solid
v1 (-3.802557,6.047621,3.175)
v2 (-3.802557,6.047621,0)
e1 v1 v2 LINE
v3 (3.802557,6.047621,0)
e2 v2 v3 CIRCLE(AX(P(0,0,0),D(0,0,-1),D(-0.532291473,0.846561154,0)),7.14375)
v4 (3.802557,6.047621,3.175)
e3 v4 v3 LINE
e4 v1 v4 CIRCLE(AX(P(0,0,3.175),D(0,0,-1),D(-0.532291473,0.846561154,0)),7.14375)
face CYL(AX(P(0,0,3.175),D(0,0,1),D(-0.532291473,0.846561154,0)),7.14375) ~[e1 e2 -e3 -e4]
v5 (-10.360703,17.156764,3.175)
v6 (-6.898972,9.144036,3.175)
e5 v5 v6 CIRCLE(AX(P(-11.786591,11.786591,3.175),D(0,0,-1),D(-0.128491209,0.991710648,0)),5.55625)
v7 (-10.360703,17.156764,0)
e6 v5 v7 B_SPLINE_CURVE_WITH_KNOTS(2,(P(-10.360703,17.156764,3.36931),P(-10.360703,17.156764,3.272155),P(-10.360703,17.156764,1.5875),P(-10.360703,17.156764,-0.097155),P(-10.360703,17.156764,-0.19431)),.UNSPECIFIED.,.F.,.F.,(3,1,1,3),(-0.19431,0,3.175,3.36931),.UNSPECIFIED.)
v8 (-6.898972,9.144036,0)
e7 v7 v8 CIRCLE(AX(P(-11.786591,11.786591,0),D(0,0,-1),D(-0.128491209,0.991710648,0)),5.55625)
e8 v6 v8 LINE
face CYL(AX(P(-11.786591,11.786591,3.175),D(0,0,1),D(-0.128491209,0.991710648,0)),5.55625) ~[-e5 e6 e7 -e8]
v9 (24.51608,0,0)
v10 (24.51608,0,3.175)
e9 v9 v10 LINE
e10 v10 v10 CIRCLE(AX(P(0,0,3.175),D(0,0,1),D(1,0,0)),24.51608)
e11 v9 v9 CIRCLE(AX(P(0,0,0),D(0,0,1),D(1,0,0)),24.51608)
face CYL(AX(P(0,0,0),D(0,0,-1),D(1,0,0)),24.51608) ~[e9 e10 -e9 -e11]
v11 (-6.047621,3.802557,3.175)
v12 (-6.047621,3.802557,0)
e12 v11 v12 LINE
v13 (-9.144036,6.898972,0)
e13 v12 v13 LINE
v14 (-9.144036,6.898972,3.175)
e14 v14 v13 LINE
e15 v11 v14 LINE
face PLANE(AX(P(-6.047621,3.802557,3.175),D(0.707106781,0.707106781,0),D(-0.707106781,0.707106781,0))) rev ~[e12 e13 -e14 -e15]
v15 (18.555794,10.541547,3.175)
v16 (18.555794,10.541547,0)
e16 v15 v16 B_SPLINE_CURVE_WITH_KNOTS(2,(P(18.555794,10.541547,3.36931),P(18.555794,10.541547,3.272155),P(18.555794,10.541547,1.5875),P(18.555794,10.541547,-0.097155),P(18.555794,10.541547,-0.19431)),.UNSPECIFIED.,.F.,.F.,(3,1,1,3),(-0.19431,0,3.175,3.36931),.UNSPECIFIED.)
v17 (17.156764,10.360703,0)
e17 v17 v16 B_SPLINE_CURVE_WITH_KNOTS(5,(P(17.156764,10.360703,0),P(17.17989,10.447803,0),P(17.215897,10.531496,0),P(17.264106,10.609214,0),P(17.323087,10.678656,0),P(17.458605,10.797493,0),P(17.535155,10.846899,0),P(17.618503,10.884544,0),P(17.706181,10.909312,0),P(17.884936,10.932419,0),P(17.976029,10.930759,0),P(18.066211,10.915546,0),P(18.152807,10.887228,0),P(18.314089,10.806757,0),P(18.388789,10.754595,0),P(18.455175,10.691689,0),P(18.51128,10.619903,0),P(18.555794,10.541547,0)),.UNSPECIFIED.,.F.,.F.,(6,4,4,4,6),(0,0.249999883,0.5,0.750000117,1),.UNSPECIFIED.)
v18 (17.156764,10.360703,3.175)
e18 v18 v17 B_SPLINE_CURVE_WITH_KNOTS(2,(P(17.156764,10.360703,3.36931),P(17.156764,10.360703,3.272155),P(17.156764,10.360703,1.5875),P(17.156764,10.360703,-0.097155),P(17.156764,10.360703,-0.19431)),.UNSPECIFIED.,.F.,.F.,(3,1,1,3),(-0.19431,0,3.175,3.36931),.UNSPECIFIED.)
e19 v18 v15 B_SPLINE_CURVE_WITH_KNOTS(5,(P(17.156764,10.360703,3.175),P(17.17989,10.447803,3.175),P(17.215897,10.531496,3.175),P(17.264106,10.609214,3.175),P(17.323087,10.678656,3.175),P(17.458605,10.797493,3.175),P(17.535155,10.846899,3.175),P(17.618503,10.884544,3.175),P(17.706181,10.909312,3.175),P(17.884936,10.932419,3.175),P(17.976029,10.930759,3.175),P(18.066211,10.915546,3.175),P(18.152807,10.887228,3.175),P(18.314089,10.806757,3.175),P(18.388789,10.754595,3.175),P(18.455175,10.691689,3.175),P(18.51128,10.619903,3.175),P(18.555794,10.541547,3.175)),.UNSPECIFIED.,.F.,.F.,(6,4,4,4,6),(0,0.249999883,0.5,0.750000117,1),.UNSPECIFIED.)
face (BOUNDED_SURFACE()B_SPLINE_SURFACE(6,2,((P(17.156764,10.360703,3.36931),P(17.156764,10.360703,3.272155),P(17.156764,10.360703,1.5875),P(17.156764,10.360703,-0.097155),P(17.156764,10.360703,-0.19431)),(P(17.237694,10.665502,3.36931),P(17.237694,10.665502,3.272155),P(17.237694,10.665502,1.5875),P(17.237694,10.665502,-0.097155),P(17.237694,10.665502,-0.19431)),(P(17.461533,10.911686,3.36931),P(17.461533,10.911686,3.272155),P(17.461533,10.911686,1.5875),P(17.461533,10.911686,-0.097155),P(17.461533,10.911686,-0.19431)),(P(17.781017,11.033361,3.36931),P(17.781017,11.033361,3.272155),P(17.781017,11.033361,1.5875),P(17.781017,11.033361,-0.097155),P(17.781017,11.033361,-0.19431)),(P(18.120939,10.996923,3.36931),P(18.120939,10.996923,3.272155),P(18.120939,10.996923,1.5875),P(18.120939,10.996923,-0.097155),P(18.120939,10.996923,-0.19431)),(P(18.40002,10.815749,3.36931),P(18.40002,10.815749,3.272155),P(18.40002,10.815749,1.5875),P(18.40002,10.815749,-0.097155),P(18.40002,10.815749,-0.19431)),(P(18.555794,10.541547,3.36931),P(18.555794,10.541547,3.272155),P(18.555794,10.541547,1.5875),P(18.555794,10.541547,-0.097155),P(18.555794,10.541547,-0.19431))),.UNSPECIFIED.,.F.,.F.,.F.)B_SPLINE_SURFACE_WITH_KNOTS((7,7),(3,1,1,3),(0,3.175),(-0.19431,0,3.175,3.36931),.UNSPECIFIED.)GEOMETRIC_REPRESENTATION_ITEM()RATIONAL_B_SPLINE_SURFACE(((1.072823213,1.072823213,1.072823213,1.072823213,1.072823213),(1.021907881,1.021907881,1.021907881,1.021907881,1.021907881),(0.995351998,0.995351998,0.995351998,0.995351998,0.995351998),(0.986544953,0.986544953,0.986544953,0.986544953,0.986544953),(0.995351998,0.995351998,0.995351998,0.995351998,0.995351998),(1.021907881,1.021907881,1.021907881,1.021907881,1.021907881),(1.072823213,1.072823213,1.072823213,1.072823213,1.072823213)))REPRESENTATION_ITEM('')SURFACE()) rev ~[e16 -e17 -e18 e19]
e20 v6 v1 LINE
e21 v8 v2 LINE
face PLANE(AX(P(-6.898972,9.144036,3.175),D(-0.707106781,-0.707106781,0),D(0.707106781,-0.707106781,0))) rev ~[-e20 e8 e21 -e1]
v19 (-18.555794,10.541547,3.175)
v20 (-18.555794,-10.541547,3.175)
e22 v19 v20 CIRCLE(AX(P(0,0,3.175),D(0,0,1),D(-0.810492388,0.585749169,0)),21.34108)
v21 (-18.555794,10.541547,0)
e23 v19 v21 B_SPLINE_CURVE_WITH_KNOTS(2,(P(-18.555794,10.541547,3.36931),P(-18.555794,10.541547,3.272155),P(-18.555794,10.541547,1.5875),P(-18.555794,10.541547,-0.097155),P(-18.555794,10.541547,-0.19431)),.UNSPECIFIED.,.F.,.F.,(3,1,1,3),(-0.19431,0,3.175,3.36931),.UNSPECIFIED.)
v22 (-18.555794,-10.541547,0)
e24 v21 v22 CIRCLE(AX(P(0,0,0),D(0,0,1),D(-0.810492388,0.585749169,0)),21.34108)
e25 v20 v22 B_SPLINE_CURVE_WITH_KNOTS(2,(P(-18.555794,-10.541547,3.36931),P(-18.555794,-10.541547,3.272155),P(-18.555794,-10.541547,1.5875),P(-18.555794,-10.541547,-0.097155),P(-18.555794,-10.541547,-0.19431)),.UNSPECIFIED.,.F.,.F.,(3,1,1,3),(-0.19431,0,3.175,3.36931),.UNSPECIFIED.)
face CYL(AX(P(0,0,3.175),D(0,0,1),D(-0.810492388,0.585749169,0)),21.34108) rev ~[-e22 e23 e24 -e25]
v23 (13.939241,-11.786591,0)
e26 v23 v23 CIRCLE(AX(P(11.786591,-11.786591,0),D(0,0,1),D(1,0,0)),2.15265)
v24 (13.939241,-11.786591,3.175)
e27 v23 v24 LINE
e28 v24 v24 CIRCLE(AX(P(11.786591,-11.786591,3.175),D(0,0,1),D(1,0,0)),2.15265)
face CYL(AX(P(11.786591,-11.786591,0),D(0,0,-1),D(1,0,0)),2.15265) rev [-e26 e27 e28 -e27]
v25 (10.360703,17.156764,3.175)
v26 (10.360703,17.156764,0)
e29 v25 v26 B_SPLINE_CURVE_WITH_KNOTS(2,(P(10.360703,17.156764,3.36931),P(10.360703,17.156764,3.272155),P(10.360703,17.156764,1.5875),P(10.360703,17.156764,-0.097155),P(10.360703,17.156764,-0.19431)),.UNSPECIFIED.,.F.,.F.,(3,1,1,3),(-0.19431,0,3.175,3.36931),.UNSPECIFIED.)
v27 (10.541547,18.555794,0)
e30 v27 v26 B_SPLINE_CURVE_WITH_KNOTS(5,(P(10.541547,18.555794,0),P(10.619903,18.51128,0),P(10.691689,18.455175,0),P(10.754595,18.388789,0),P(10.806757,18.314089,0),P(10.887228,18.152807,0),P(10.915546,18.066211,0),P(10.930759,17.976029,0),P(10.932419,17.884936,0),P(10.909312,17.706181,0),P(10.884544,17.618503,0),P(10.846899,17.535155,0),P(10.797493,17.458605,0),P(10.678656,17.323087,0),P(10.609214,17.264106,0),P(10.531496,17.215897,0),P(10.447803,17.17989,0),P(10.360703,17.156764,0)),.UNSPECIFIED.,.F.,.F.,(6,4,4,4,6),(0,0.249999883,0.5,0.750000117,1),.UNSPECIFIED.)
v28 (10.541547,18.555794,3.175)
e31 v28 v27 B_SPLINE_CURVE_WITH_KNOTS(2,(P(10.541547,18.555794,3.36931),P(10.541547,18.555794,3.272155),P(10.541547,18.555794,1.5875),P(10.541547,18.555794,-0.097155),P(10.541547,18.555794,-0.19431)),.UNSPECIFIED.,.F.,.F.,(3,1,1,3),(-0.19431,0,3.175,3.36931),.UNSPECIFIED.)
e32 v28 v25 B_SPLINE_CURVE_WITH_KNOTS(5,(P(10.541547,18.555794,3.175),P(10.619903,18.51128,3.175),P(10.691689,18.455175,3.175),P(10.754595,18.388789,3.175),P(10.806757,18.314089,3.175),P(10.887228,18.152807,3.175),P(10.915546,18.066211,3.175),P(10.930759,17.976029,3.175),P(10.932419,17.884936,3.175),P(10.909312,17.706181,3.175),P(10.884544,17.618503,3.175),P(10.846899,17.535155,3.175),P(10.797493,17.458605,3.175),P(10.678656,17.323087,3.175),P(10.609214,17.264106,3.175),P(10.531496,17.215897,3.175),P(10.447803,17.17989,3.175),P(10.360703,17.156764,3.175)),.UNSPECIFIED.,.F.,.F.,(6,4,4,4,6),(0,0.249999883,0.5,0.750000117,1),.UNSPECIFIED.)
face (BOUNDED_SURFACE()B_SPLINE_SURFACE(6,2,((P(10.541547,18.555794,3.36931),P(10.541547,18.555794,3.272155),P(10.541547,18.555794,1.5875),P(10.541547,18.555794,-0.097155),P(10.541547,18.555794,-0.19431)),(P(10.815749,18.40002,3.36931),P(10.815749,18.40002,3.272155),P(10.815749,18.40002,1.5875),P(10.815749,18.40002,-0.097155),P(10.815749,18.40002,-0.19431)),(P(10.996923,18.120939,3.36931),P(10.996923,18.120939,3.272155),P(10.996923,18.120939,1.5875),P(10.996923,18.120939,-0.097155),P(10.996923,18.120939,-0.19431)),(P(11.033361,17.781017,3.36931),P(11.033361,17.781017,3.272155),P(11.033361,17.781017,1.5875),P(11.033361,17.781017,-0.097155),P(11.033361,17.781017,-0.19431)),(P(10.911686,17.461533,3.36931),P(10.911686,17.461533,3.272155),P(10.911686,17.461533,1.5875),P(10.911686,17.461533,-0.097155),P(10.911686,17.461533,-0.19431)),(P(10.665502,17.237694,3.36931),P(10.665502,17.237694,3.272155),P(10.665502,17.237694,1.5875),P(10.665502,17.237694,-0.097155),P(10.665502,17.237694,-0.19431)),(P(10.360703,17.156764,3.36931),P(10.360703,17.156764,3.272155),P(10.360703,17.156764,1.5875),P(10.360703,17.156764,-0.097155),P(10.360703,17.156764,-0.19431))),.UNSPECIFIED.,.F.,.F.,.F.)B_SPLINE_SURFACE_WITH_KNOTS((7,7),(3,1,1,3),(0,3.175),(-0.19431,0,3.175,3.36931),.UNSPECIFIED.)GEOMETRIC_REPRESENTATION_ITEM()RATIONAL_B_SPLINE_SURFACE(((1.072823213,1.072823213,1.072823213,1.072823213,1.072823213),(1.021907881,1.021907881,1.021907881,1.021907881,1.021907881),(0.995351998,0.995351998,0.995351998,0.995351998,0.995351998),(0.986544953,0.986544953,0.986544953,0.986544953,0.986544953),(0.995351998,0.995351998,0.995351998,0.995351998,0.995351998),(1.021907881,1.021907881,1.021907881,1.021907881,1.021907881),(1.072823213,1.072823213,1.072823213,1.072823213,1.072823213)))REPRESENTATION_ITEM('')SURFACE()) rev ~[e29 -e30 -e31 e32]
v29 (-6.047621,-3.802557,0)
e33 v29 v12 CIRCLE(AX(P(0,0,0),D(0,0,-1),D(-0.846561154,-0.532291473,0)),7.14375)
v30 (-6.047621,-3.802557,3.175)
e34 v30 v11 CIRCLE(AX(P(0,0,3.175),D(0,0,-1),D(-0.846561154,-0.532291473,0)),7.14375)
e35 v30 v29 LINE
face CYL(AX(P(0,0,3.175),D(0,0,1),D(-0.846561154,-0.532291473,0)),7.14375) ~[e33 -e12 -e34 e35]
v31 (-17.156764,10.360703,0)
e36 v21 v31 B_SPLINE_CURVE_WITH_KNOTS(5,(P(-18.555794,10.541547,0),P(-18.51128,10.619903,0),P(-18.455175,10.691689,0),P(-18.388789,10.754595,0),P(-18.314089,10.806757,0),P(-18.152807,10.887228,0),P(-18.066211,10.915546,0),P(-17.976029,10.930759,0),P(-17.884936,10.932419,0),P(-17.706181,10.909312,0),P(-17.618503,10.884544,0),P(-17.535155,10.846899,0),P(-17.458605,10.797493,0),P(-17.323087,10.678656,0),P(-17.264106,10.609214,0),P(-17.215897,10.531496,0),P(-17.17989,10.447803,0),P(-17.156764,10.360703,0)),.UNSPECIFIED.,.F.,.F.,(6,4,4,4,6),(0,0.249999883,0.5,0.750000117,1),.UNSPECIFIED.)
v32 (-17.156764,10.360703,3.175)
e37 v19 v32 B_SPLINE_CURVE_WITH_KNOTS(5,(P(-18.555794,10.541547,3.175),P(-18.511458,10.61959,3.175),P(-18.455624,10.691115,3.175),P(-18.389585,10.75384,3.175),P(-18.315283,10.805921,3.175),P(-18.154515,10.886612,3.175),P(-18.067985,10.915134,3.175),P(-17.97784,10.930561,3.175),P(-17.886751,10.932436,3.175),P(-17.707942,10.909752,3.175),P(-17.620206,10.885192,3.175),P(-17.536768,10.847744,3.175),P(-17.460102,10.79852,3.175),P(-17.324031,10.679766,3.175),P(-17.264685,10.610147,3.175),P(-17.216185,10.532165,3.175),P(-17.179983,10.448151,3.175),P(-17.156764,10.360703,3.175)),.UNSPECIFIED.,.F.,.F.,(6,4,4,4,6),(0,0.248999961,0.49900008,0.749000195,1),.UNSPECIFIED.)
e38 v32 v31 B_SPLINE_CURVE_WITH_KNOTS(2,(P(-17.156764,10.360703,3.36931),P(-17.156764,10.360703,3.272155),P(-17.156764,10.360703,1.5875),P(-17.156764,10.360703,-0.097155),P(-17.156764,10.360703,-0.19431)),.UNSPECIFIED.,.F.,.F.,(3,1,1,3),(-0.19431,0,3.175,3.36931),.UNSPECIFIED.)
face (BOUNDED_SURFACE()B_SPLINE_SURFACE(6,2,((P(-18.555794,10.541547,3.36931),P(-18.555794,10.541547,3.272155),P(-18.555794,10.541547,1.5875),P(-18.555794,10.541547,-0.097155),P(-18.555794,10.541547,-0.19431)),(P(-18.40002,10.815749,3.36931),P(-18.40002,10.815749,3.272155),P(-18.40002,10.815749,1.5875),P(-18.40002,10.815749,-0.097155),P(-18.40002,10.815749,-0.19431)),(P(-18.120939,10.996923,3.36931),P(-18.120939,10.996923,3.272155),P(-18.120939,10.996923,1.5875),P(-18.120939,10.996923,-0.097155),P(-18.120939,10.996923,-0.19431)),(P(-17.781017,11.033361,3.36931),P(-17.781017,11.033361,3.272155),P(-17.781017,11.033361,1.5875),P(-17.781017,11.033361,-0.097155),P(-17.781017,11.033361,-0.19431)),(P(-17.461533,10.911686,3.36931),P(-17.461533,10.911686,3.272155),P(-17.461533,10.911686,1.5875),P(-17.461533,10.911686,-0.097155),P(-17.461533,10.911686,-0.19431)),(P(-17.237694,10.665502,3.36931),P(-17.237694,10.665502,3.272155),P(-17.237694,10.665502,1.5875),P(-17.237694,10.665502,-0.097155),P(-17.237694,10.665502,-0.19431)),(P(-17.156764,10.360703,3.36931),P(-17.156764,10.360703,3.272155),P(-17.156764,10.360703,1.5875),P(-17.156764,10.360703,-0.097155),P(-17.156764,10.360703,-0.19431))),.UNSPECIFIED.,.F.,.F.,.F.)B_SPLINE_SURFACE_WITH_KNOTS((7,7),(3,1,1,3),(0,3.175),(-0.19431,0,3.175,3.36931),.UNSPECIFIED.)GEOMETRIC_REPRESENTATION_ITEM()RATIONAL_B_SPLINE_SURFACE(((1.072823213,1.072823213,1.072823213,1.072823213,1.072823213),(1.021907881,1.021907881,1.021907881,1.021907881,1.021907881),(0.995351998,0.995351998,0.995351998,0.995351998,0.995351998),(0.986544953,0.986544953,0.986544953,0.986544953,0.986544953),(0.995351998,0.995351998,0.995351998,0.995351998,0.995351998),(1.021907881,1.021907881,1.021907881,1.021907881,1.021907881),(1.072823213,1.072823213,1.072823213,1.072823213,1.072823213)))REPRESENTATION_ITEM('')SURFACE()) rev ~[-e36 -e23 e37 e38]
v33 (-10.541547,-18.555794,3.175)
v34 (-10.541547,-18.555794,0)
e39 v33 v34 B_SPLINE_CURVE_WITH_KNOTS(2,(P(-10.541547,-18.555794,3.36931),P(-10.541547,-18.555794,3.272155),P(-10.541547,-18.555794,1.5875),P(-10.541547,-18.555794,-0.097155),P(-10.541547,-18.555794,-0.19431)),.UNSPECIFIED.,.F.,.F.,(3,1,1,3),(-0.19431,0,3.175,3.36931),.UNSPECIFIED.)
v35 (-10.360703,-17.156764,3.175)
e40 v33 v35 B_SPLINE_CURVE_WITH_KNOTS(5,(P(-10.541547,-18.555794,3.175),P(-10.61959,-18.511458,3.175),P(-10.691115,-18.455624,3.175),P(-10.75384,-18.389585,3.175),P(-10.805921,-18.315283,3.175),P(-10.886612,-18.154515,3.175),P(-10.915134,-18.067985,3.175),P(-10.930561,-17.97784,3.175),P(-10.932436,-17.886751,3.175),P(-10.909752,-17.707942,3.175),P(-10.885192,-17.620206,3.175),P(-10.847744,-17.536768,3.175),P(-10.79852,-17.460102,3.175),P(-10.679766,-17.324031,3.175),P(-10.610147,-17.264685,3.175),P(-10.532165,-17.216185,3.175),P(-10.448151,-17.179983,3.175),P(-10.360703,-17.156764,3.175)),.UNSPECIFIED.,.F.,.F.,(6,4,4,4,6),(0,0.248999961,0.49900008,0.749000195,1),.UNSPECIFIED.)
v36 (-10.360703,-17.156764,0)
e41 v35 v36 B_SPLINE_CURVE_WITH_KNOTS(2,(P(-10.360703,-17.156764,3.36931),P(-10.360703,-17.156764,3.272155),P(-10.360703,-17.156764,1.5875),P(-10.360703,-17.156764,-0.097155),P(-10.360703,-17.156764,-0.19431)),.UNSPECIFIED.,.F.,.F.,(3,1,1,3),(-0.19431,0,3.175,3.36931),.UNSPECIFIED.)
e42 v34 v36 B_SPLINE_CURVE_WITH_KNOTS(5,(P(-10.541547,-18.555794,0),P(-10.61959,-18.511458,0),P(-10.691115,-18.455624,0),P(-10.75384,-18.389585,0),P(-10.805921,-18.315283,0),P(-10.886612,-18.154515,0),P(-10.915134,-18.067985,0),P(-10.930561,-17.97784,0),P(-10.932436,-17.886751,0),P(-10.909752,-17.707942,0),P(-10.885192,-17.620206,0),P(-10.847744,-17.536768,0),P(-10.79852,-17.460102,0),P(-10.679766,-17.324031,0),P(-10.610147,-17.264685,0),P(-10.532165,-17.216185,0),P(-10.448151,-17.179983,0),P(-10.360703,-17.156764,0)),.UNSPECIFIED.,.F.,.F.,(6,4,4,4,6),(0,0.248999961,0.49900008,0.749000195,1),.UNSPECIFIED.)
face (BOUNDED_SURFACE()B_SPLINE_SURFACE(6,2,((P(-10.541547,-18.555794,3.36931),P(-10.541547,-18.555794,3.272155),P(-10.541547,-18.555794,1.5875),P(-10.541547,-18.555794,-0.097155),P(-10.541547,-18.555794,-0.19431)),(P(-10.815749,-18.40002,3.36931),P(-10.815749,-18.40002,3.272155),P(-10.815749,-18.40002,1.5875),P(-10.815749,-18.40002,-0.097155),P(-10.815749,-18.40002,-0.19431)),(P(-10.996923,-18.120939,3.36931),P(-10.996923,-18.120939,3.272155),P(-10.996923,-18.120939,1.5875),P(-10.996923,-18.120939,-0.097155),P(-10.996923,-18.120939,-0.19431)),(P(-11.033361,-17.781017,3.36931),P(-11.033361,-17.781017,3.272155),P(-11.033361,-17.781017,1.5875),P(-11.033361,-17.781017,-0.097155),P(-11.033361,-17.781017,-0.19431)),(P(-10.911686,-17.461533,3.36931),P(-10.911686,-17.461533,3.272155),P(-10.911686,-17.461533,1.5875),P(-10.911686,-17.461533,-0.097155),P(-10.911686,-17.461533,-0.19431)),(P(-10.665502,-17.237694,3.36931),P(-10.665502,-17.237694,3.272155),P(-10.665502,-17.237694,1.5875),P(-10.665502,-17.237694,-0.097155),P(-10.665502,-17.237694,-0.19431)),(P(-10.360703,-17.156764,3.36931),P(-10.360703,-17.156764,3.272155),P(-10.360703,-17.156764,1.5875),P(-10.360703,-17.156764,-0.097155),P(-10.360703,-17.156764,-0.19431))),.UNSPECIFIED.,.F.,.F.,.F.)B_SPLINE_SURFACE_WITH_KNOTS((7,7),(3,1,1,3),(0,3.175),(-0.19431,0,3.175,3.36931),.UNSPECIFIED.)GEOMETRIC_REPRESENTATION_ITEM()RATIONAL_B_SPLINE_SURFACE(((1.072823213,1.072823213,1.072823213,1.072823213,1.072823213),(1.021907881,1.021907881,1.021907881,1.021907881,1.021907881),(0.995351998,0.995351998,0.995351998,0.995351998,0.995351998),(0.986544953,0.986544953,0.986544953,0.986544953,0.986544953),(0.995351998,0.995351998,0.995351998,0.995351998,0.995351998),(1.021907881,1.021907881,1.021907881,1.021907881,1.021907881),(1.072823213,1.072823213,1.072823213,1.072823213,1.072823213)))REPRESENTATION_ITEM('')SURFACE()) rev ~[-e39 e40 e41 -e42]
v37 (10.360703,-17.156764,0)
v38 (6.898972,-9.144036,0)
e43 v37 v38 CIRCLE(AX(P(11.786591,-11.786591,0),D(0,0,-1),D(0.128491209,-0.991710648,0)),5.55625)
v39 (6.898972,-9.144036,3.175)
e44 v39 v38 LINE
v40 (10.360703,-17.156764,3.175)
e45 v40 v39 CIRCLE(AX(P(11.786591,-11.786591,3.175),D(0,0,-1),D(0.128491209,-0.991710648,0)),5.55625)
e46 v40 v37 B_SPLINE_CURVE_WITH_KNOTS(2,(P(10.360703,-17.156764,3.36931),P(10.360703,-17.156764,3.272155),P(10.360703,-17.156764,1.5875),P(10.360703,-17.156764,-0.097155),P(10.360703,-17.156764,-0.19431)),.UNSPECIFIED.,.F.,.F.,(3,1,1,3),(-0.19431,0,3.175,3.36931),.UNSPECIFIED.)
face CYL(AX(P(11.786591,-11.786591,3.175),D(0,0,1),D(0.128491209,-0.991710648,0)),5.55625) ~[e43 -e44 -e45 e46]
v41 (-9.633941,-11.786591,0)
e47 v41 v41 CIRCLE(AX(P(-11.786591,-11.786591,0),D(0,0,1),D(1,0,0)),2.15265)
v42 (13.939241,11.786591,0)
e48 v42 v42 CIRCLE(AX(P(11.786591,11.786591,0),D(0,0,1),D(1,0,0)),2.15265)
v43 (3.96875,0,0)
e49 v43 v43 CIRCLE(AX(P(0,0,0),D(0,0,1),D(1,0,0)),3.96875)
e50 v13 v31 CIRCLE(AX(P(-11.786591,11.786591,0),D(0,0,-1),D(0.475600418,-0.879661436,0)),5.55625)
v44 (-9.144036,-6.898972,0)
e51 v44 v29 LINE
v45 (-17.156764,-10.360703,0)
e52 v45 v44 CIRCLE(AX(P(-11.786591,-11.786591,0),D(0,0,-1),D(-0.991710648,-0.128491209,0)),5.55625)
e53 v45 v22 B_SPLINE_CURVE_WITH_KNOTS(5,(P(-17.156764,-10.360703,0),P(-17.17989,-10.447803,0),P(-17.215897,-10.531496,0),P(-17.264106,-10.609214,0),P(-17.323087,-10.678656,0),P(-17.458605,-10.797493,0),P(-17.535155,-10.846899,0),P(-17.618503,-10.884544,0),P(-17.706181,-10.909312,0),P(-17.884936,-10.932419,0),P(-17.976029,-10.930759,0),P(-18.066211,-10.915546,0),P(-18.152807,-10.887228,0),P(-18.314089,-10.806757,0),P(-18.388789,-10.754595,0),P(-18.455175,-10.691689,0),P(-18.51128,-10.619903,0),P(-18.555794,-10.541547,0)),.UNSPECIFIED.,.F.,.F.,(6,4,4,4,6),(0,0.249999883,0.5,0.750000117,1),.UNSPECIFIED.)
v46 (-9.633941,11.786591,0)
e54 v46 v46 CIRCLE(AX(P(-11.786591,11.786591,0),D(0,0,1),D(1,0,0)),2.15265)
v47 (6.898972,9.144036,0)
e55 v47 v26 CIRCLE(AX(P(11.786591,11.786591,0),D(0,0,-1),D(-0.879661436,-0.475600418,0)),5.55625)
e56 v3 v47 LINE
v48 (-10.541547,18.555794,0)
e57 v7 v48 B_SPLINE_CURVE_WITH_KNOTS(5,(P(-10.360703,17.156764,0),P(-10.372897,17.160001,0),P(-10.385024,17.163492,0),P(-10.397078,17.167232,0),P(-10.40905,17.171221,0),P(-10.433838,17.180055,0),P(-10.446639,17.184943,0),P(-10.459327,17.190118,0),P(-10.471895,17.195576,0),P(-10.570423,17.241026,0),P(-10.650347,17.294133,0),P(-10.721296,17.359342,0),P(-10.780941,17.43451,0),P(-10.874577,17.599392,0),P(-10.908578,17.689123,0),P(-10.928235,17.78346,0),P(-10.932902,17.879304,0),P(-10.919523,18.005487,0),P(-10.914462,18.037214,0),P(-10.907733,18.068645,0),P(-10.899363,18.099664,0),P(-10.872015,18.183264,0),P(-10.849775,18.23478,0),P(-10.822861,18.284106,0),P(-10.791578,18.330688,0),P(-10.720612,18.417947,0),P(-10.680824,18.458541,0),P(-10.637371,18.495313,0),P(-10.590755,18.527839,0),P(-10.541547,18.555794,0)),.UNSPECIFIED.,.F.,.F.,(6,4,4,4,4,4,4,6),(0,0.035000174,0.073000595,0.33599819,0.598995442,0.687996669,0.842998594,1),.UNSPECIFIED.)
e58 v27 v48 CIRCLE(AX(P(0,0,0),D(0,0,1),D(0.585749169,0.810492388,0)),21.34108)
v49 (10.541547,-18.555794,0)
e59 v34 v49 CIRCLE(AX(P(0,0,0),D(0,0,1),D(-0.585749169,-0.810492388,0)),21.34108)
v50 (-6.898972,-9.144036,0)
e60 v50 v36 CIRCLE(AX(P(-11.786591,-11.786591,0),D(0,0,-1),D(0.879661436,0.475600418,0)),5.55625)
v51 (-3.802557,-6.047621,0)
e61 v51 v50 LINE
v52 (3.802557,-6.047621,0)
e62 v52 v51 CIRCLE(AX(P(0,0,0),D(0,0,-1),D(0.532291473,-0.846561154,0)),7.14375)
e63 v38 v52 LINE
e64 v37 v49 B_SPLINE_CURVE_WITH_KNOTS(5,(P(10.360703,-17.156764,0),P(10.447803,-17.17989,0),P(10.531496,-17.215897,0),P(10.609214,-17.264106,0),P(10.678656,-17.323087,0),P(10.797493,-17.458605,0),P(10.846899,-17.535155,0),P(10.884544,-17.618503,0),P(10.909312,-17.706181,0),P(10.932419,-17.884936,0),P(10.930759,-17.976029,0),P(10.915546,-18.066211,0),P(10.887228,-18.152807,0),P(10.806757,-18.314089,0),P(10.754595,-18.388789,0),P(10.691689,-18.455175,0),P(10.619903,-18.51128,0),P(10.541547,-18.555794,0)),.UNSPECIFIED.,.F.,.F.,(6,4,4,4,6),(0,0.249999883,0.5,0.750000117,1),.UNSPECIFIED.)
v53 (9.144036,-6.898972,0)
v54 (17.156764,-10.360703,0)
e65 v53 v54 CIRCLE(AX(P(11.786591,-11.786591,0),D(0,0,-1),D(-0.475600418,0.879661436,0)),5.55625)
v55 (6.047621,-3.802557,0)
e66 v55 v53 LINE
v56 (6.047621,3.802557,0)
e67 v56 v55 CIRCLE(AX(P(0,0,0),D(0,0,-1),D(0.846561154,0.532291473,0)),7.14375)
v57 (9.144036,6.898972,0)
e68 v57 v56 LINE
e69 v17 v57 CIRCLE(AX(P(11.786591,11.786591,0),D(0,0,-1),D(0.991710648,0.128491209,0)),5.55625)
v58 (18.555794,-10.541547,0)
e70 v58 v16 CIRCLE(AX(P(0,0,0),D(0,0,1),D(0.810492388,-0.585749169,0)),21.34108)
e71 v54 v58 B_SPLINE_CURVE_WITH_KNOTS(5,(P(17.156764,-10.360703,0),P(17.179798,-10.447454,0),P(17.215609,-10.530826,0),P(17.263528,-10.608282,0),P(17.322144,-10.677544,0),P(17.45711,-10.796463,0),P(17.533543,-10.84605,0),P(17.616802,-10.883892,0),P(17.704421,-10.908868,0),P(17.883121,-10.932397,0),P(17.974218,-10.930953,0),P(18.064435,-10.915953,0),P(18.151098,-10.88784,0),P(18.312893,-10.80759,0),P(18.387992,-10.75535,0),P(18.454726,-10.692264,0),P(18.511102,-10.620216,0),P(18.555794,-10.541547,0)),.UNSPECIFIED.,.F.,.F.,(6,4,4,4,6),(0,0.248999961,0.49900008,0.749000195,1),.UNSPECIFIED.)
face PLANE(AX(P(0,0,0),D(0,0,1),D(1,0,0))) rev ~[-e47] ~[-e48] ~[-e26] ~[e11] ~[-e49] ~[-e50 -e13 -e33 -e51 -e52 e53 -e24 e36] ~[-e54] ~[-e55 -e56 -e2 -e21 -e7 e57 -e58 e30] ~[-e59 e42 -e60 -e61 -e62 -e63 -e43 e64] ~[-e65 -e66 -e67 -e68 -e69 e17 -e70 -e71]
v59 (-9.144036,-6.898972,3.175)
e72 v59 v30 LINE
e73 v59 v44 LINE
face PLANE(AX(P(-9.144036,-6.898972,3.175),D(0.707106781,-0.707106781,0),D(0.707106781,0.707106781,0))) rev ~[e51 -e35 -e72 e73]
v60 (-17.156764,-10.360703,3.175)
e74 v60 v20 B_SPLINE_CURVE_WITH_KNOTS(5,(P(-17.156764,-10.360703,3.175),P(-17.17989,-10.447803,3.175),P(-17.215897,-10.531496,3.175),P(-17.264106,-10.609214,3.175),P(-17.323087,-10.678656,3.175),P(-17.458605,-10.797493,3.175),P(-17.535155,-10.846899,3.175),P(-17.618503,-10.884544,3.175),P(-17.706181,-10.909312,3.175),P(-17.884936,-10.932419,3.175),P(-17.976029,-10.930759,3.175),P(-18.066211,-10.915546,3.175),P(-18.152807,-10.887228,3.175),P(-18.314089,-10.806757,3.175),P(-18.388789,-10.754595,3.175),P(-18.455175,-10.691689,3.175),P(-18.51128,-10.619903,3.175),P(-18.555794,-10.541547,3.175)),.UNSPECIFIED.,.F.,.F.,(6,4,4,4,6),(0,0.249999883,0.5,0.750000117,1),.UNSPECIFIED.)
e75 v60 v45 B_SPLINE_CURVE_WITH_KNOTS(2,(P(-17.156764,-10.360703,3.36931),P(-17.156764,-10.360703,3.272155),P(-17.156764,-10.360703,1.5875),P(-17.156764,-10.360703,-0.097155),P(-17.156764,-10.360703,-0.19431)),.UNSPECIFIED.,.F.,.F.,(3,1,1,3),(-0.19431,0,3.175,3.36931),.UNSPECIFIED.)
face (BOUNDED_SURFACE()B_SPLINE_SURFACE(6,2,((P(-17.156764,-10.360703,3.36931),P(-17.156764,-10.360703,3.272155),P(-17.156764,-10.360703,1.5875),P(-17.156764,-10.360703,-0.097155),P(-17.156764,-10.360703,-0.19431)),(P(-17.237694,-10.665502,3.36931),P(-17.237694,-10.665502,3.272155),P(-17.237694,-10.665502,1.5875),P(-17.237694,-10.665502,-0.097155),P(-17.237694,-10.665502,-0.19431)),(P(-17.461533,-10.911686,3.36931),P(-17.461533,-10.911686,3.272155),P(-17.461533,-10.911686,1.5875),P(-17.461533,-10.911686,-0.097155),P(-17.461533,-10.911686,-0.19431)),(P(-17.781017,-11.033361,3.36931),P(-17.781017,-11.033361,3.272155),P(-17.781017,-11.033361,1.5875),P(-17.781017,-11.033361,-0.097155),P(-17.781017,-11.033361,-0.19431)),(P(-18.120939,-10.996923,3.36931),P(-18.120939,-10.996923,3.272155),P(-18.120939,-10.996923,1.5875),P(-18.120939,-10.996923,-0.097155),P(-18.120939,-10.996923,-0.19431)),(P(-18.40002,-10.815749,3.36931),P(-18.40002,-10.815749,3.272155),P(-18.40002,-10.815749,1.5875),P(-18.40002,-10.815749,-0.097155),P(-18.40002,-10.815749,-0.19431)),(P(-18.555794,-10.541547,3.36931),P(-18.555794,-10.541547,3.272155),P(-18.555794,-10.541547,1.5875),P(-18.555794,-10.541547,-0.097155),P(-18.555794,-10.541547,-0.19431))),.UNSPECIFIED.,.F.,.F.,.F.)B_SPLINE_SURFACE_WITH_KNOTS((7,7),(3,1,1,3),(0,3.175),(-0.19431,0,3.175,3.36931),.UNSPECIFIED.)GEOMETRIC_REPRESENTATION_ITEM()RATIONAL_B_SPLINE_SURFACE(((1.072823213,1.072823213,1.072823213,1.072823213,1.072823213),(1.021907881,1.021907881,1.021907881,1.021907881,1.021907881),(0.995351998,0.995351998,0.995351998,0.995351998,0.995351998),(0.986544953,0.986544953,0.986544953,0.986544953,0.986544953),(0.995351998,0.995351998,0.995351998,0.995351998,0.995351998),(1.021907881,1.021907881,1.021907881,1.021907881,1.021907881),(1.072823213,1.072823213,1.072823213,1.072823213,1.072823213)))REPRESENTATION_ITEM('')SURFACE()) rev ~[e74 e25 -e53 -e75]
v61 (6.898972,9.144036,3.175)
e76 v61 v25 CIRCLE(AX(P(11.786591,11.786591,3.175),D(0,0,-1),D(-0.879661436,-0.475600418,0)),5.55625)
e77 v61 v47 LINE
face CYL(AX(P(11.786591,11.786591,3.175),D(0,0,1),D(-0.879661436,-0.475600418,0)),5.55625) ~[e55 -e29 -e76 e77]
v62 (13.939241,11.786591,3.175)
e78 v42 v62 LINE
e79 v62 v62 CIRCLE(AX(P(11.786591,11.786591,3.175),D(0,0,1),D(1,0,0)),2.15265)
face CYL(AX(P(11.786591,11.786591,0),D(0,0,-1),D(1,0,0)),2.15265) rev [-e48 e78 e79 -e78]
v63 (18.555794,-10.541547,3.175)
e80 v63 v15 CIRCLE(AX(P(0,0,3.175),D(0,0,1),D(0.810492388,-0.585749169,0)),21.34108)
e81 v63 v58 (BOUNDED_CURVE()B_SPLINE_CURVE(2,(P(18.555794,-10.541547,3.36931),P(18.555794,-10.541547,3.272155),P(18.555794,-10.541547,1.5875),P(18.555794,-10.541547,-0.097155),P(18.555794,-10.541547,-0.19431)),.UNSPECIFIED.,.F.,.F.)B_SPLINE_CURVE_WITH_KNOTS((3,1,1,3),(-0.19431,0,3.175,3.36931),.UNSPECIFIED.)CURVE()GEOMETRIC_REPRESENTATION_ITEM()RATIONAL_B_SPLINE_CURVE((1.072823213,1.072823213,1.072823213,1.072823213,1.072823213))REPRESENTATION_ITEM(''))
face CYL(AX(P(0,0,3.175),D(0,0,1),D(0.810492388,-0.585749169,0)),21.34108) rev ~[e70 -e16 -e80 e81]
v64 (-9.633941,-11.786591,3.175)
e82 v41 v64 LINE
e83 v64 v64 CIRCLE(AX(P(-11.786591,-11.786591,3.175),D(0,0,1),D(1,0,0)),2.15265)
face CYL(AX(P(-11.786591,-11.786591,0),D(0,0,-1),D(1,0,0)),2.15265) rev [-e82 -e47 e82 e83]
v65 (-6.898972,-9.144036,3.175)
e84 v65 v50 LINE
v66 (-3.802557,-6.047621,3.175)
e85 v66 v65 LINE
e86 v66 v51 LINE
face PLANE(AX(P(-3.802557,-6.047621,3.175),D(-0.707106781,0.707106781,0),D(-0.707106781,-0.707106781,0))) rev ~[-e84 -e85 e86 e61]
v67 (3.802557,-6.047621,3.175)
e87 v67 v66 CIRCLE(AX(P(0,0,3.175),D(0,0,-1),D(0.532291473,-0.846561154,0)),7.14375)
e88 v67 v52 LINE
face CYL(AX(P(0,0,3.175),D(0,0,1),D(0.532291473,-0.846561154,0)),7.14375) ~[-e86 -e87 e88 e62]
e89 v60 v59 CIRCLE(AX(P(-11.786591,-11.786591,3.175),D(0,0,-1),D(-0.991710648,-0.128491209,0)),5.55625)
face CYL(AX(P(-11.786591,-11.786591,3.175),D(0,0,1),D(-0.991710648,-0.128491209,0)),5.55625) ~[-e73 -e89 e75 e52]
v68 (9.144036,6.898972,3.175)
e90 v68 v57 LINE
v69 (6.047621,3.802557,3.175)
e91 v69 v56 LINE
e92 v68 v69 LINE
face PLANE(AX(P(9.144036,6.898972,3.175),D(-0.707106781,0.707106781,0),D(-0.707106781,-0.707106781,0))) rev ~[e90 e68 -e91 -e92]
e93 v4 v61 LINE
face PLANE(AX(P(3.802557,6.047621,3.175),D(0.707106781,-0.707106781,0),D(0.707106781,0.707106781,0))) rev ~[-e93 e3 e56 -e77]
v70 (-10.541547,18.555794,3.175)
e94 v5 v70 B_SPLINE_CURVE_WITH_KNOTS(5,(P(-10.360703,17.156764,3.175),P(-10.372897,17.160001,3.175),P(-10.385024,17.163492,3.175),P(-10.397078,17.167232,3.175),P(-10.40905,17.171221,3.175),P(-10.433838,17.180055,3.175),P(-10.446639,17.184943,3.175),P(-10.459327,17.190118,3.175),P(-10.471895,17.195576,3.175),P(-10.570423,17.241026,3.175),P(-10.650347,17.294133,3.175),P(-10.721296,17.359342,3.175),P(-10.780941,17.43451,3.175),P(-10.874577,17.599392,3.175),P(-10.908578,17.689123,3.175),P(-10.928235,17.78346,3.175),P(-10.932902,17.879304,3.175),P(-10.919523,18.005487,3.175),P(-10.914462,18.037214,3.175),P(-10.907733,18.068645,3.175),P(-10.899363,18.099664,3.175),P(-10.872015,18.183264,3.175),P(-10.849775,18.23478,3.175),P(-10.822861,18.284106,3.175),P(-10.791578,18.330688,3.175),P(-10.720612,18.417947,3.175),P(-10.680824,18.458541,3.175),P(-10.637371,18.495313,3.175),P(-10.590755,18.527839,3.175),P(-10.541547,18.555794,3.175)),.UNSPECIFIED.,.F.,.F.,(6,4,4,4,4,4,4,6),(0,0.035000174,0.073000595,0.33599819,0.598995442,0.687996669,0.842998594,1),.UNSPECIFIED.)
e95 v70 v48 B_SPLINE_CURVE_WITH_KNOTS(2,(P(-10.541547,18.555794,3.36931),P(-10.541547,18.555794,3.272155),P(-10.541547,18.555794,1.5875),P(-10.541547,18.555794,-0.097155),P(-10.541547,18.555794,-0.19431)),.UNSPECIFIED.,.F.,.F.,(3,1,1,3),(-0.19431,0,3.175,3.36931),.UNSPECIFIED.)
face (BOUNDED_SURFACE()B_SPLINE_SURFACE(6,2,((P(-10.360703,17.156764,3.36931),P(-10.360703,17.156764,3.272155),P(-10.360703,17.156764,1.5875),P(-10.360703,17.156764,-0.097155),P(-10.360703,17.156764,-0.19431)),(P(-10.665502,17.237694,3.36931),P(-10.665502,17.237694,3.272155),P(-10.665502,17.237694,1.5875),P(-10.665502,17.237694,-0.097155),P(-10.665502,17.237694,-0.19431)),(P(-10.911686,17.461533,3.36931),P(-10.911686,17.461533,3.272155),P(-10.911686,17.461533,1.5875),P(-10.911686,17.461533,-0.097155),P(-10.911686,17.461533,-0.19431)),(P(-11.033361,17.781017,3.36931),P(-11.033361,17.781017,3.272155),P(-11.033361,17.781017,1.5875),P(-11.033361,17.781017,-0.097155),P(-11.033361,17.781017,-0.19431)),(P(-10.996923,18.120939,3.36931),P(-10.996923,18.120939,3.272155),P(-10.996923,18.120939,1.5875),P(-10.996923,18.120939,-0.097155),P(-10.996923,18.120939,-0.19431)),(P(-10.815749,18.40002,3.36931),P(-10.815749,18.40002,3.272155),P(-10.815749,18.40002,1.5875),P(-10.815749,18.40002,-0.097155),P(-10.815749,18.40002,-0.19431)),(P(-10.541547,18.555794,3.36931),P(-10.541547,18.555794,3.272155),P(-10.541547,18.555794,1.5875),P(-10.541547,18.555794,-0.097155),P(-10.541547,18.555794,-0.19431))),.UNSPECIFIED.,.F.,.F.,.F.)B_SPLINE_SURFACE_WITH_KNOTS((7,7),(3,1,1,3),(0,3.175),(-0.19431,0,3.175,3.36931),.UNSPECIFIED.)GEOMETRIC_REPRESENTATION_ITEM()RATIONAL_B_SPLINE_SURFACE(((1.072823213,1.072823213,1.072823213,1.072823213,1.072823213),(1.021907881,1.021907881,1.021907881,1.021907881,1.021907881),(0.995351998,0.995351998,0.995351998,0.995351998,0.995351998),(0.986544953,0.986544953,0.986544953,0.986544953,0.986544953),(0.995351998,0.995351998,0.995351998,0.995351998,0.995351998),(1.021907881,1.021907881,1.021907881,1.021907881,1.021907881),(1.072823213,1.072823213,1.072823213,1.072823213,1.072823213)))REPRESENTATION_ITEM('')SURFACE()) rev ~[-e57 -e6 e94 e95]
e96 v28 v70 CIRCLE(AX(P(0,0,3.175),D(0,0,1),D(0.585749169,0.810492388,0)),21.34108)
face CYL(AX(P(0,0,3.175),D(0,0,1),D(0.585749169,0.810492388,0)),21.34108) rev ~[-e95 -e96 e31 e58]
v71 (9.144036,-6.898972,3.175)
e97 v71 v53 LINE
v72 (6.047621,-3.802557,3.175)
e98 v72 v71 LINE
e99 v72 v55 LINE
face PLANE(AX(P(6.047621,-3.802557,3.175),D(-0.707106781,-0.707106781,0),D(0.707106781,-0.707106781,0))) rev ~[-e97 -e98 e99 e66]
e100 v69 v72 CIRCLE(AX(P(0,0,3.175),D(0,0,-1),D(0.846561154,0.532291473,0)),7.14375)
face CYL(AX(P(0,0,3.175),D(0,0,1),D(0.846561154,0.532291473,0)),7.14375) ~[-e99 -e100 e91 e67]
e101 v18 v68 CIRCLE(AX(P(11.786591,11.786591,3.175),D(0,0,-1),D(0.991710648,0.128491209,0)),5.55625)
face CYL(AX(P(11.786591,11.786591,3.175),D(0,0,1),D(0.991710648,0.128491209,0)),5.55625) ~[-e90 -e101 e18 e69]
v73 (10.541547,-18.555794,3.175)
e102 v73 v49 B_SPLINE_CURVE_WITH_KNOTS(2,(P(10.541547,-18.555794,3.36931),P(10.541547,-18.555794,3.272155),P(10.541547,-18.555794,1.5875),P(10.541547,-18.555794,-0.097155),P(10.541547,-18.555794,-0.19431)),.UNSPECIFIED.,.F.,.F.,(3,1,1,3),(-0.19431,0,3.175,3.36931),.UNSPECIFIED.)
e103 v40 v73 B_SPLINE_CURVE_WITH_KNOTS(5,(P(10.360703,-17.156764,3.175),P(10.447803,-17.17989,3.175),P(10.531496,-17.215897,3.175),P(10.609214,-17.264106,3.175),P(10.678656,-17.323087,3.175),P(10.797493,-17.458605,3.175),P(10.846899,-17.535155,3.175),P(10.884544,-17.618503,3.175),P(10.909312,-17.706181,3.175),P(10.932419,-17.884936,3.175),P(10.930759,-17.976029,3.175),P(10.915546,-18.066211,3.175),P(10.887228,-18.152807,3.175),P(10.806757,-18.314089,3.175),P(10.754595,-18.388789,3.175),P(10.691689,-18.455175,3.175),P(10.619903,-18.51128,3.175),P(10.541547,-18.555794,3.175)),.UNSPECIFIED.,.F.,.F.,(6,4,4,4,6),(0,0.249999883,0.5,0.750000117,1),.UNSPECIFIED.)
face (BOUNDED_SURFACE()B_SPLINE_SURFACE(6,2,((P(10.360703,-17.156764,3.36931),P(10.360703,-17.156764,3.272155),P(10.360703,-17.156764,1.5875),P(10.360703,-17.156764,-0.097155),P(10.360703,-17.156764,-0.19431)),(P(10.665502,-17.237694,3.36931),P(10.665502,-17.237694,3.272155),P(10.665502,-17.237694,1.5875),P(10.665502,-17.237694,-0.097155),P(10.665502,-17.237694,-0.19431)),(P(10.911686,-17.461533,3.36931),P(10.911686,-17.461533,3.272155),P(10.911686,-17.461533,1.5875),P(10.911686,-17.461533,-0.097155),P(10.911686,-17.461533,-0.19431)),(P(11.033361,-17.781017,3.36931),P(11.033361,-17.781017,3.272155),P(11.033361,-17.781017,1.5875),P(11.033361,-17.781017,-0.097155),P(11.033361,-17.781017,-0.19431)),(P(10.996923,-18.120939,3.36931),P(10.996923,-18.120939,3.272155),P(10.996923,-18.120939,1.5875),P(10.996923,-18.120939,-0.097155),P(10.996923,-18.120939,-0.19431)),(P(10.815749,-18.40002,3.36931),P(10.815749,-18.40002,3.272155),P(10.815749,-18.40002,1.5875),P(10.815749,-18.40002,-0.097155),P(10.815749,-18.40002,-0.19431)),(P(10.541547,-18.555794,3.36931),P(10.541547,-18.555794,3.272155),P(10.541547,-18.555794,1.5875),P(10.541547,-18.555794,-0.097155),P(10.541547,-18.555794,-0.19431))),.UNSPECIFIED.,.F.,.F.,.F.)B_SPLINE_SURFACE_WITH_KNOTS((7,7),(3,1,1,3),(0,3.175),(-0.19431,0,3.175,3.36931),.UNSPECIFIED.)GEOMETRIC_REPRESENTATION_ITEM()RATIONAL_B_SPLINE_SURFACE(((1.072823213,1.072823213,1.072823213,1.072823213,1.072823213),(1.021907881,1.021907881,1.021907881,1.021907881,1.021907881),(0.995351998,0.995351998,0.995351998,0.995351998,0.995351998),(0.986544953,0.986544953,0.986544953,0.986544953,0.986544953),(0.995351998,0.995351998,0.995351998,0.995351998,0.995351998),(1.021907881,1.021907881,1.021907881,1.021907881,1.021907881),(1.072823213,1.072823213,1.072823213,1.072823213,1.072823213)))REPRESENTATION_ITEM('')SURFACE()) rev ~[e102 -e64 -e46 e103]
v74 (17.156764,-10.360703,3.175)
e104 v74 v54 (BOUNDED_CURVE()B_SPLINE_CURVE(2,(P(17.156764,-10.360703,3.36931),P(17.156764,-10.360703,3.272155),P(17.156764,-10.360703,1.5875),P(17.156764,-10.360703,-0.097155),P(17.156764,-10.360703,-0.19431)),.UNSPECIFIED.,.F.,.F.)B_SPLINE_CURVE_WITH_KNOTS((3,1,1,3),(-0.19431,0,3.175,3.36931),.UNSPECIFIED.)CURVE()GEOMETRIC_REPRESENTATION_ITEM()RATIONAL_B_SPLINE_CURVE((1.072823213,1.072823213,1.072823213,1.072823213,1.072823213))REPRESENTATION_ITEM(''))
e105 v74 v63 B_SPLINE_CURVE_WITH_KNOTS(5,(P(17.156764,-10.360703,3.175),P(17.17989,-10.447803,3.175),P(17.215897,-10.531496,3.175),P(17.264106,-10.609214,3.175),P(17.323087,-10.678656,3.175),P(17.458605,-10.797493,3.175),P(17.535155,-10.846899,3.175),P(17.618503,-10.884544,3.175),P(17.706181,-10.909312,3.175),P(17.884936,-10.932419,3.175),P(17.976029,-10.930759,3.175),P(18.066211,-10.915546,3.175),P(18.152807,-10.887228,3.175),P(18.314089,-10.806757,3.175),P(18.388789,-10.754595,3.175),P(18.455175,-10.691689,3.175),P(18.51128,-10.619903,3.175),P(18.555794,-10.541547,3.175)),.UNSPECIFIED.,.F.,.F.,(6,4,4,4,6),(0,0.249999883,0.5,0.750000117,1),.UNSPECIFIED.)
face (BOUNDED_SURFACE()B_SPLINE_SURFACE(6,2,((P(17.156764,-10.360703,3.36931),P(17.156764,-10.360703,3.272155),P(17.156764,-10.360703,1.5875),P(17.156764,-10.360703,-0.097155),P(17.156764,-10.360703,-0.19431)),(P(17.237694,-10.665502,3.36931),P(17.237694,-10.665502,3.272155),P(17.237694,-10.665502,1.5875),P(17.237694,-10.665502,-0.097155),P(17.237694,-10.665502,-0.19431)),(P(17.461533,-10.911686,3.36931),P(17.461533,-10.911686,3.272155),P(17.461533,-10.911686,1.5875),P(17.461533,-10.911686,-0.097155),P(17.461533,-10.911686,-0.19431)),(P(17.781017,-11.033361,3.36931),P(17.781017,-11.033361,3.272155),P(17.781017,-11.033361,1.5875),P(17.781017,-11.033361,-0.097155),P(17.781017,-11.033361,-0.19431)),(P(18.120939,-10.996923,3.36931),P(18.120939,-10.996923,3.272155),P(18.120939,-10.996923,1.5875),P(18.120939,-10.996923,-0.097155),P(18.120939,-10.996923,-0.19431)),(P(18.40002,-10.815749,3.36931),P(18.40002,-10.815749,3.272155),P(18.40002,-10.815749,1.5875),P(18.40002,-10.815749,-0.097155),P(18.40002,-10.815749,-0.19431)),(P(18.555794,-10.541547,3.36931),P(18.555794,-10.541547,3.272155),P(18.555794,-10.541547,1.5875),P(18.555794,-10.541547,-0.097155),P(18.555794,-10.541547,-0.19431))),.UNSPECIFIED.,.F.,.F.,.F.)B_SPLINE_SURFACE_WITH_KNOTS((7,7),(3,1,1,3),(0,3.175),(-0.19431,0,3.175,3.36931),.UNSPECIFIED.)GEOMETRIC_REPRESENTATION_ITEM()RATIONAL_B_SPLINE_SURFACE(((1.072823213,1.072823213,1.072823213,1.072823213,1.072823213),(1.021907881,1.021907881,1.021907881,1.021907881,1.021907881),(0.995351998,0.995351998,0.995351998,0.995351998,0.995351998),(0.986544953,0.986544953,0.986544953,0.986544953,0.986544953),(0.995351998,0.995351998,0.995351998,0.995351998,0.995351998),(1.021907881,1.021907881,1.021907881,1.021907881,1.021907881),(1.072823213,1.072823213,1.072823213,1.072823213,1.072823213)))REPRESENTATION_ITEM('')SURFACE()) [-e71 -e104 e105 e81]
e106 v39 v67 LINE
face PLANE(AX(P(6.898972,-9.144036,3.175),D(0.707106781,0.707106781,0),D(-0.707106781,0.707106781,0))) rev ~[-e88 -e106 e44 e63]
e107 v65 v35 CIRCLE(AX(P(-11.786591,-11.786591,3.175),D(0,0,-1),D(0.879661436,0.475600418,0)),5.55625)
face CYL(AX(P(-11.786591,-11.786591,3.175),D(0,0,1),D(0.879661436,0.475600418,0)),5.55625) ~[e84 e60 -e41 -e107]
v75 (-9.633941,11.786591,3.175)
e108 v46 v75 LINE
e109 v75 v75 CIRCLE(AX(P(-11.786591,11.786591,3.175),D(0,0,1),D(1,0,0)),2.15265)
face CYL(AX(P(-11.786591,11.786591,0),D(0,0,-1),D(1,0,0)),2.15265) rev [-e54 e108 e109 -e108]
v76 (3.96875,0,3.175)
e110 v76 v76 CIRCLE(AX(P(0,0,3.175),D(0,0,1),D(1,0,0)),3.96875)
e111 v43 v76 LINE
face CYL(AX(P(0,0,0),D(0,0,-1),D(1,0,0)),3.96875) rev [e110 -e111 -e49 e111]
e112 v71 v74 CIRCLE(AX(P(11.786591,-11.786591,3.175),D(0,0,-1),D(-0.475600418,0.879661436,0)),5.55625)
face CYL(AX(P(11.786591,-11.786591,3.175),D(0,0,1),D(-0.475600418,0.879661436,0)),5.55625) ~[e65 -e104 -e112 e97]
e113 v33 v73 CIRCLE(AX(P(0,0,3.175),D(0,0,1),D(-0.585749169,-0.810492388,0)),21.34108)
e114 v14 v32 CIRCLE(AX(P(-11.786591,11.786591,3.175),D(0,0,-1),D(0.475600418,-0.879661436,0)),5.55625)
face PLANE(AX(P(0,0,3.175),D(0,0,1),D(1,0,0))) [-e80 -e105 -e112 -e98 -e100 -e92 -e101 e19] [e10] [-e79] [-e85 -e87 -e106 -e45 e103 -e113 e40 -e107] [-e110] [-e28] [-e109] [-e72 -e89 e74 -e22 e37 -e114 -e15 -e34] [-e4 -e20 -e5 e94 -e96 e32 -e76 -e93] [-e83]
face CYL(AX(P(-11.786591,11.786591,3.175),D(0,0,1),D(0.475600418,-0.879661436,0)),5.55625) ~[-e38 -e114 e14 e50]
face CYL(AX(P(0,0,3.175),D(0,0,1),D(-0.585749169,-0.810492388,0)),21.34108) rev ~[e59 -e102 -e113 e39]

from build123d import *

# Parameters (mm, degrees)
F0_R            = 24.51608
F0_R_2          = 2.15265
F0_R_3          = 3.96875
F1_DEPTH        = 3.175
F3_DEPTH        = 3.175
F3_COPIES_COUNT = 4
F4_R            = 0.762


# Not quite as in the source:
# - a pattern or mirror of a feature is missing from the dataset's text; its kind, count and spacing are read off the source's solid


with BuildPart() as f1:
    # F0 (on Top) → F1 (new body)
    with BuildSketch(Plane.XY):
        Circle(F0_R)
        with Locations((-11.7865906, -11.7865906)):
            Circle(F0_R_2, mode=Mode.SUBTRACT)
        with Locations((11.7865906, -11.7865906)):
            Circle(F0_R_2, mode=Mode.SUBTRACT)
        with Locations((-11.7865906, 11.7865906)):
            Circle(F0_R_2, mode=Mode.SUBTRACT)
        Circle(F0_R_3, mode=Mode.SUBTRACT)
        with Locations((11.7865906, 11.7865906)):
            Circle(F0_R_2, mode=Mode.SUBTRACT)
    extrude(amount=F1_DEPTH)

    # F2 (on face) → F3 (cut, through all)
    with BuildSketch(Plane.XY.offset(3.175)):
        with BuildLine():
            ThreePointArc((-12.5005198818, 17.2967828873), (-7.207099086, 14.9330444032), (-6.8989717457, 9.144035776))
            Line((-6.8989717457, 9.144035776), (-3.8025572131, 6.0476212434))
            ThreePointArc((-3.8025572131, 6.0476212434), (0, 7.14375), (3.8025572131, 6.0476212434))
            Line((3.8025572131, 6.0476212434), (6.8989717457, 9.144035776))
            ThreePointArc((6.8989717457, 9.144035776), (7.207099086, 14.9330444032), (12.5005198818, 17.2967828873))
            ThreePointArc((12.5005198818, 17.2967828873), (0, 21.34108), (-12.5005198818, 17.2967828873))
        make_face()
    f3 = extrude(amount=-F3_DEPTH, mode=Mode.SUBTRACT)

    # F3_copies: F3 ×4 about axis
    f3_copies_axis = Axis((0, 0, 0), (0, 0, 1))
    for i in range(1, F3_COPIES_COUNT):
        add(f3.rotate(f3_copies_axis, i * 360 / F3_COPIES_COUNT), mode=Mode.SUBTRACT)

    # F4
    f4_edges = [f1.edges().sort_by_distance(p)[0] for p in [
        (-12.50052, 17.296783, 1.5875),
        (12.50052, 17.296783, 1.5875),
        (12.50052, -17.296783, 1.5875),
        (-12.50052, -17.296783, 1.5875),
        (17.296783, 12.50052, 1.5875),
        (17.296783, -12.50052, 1.5875),
        (-17.296783, -12.50052, 1.5875),
        (-17.296783, 12.50052, 1.5875),
    ]]
    fillet(f4_edges, radius=F4_R)


solid = f1.part
